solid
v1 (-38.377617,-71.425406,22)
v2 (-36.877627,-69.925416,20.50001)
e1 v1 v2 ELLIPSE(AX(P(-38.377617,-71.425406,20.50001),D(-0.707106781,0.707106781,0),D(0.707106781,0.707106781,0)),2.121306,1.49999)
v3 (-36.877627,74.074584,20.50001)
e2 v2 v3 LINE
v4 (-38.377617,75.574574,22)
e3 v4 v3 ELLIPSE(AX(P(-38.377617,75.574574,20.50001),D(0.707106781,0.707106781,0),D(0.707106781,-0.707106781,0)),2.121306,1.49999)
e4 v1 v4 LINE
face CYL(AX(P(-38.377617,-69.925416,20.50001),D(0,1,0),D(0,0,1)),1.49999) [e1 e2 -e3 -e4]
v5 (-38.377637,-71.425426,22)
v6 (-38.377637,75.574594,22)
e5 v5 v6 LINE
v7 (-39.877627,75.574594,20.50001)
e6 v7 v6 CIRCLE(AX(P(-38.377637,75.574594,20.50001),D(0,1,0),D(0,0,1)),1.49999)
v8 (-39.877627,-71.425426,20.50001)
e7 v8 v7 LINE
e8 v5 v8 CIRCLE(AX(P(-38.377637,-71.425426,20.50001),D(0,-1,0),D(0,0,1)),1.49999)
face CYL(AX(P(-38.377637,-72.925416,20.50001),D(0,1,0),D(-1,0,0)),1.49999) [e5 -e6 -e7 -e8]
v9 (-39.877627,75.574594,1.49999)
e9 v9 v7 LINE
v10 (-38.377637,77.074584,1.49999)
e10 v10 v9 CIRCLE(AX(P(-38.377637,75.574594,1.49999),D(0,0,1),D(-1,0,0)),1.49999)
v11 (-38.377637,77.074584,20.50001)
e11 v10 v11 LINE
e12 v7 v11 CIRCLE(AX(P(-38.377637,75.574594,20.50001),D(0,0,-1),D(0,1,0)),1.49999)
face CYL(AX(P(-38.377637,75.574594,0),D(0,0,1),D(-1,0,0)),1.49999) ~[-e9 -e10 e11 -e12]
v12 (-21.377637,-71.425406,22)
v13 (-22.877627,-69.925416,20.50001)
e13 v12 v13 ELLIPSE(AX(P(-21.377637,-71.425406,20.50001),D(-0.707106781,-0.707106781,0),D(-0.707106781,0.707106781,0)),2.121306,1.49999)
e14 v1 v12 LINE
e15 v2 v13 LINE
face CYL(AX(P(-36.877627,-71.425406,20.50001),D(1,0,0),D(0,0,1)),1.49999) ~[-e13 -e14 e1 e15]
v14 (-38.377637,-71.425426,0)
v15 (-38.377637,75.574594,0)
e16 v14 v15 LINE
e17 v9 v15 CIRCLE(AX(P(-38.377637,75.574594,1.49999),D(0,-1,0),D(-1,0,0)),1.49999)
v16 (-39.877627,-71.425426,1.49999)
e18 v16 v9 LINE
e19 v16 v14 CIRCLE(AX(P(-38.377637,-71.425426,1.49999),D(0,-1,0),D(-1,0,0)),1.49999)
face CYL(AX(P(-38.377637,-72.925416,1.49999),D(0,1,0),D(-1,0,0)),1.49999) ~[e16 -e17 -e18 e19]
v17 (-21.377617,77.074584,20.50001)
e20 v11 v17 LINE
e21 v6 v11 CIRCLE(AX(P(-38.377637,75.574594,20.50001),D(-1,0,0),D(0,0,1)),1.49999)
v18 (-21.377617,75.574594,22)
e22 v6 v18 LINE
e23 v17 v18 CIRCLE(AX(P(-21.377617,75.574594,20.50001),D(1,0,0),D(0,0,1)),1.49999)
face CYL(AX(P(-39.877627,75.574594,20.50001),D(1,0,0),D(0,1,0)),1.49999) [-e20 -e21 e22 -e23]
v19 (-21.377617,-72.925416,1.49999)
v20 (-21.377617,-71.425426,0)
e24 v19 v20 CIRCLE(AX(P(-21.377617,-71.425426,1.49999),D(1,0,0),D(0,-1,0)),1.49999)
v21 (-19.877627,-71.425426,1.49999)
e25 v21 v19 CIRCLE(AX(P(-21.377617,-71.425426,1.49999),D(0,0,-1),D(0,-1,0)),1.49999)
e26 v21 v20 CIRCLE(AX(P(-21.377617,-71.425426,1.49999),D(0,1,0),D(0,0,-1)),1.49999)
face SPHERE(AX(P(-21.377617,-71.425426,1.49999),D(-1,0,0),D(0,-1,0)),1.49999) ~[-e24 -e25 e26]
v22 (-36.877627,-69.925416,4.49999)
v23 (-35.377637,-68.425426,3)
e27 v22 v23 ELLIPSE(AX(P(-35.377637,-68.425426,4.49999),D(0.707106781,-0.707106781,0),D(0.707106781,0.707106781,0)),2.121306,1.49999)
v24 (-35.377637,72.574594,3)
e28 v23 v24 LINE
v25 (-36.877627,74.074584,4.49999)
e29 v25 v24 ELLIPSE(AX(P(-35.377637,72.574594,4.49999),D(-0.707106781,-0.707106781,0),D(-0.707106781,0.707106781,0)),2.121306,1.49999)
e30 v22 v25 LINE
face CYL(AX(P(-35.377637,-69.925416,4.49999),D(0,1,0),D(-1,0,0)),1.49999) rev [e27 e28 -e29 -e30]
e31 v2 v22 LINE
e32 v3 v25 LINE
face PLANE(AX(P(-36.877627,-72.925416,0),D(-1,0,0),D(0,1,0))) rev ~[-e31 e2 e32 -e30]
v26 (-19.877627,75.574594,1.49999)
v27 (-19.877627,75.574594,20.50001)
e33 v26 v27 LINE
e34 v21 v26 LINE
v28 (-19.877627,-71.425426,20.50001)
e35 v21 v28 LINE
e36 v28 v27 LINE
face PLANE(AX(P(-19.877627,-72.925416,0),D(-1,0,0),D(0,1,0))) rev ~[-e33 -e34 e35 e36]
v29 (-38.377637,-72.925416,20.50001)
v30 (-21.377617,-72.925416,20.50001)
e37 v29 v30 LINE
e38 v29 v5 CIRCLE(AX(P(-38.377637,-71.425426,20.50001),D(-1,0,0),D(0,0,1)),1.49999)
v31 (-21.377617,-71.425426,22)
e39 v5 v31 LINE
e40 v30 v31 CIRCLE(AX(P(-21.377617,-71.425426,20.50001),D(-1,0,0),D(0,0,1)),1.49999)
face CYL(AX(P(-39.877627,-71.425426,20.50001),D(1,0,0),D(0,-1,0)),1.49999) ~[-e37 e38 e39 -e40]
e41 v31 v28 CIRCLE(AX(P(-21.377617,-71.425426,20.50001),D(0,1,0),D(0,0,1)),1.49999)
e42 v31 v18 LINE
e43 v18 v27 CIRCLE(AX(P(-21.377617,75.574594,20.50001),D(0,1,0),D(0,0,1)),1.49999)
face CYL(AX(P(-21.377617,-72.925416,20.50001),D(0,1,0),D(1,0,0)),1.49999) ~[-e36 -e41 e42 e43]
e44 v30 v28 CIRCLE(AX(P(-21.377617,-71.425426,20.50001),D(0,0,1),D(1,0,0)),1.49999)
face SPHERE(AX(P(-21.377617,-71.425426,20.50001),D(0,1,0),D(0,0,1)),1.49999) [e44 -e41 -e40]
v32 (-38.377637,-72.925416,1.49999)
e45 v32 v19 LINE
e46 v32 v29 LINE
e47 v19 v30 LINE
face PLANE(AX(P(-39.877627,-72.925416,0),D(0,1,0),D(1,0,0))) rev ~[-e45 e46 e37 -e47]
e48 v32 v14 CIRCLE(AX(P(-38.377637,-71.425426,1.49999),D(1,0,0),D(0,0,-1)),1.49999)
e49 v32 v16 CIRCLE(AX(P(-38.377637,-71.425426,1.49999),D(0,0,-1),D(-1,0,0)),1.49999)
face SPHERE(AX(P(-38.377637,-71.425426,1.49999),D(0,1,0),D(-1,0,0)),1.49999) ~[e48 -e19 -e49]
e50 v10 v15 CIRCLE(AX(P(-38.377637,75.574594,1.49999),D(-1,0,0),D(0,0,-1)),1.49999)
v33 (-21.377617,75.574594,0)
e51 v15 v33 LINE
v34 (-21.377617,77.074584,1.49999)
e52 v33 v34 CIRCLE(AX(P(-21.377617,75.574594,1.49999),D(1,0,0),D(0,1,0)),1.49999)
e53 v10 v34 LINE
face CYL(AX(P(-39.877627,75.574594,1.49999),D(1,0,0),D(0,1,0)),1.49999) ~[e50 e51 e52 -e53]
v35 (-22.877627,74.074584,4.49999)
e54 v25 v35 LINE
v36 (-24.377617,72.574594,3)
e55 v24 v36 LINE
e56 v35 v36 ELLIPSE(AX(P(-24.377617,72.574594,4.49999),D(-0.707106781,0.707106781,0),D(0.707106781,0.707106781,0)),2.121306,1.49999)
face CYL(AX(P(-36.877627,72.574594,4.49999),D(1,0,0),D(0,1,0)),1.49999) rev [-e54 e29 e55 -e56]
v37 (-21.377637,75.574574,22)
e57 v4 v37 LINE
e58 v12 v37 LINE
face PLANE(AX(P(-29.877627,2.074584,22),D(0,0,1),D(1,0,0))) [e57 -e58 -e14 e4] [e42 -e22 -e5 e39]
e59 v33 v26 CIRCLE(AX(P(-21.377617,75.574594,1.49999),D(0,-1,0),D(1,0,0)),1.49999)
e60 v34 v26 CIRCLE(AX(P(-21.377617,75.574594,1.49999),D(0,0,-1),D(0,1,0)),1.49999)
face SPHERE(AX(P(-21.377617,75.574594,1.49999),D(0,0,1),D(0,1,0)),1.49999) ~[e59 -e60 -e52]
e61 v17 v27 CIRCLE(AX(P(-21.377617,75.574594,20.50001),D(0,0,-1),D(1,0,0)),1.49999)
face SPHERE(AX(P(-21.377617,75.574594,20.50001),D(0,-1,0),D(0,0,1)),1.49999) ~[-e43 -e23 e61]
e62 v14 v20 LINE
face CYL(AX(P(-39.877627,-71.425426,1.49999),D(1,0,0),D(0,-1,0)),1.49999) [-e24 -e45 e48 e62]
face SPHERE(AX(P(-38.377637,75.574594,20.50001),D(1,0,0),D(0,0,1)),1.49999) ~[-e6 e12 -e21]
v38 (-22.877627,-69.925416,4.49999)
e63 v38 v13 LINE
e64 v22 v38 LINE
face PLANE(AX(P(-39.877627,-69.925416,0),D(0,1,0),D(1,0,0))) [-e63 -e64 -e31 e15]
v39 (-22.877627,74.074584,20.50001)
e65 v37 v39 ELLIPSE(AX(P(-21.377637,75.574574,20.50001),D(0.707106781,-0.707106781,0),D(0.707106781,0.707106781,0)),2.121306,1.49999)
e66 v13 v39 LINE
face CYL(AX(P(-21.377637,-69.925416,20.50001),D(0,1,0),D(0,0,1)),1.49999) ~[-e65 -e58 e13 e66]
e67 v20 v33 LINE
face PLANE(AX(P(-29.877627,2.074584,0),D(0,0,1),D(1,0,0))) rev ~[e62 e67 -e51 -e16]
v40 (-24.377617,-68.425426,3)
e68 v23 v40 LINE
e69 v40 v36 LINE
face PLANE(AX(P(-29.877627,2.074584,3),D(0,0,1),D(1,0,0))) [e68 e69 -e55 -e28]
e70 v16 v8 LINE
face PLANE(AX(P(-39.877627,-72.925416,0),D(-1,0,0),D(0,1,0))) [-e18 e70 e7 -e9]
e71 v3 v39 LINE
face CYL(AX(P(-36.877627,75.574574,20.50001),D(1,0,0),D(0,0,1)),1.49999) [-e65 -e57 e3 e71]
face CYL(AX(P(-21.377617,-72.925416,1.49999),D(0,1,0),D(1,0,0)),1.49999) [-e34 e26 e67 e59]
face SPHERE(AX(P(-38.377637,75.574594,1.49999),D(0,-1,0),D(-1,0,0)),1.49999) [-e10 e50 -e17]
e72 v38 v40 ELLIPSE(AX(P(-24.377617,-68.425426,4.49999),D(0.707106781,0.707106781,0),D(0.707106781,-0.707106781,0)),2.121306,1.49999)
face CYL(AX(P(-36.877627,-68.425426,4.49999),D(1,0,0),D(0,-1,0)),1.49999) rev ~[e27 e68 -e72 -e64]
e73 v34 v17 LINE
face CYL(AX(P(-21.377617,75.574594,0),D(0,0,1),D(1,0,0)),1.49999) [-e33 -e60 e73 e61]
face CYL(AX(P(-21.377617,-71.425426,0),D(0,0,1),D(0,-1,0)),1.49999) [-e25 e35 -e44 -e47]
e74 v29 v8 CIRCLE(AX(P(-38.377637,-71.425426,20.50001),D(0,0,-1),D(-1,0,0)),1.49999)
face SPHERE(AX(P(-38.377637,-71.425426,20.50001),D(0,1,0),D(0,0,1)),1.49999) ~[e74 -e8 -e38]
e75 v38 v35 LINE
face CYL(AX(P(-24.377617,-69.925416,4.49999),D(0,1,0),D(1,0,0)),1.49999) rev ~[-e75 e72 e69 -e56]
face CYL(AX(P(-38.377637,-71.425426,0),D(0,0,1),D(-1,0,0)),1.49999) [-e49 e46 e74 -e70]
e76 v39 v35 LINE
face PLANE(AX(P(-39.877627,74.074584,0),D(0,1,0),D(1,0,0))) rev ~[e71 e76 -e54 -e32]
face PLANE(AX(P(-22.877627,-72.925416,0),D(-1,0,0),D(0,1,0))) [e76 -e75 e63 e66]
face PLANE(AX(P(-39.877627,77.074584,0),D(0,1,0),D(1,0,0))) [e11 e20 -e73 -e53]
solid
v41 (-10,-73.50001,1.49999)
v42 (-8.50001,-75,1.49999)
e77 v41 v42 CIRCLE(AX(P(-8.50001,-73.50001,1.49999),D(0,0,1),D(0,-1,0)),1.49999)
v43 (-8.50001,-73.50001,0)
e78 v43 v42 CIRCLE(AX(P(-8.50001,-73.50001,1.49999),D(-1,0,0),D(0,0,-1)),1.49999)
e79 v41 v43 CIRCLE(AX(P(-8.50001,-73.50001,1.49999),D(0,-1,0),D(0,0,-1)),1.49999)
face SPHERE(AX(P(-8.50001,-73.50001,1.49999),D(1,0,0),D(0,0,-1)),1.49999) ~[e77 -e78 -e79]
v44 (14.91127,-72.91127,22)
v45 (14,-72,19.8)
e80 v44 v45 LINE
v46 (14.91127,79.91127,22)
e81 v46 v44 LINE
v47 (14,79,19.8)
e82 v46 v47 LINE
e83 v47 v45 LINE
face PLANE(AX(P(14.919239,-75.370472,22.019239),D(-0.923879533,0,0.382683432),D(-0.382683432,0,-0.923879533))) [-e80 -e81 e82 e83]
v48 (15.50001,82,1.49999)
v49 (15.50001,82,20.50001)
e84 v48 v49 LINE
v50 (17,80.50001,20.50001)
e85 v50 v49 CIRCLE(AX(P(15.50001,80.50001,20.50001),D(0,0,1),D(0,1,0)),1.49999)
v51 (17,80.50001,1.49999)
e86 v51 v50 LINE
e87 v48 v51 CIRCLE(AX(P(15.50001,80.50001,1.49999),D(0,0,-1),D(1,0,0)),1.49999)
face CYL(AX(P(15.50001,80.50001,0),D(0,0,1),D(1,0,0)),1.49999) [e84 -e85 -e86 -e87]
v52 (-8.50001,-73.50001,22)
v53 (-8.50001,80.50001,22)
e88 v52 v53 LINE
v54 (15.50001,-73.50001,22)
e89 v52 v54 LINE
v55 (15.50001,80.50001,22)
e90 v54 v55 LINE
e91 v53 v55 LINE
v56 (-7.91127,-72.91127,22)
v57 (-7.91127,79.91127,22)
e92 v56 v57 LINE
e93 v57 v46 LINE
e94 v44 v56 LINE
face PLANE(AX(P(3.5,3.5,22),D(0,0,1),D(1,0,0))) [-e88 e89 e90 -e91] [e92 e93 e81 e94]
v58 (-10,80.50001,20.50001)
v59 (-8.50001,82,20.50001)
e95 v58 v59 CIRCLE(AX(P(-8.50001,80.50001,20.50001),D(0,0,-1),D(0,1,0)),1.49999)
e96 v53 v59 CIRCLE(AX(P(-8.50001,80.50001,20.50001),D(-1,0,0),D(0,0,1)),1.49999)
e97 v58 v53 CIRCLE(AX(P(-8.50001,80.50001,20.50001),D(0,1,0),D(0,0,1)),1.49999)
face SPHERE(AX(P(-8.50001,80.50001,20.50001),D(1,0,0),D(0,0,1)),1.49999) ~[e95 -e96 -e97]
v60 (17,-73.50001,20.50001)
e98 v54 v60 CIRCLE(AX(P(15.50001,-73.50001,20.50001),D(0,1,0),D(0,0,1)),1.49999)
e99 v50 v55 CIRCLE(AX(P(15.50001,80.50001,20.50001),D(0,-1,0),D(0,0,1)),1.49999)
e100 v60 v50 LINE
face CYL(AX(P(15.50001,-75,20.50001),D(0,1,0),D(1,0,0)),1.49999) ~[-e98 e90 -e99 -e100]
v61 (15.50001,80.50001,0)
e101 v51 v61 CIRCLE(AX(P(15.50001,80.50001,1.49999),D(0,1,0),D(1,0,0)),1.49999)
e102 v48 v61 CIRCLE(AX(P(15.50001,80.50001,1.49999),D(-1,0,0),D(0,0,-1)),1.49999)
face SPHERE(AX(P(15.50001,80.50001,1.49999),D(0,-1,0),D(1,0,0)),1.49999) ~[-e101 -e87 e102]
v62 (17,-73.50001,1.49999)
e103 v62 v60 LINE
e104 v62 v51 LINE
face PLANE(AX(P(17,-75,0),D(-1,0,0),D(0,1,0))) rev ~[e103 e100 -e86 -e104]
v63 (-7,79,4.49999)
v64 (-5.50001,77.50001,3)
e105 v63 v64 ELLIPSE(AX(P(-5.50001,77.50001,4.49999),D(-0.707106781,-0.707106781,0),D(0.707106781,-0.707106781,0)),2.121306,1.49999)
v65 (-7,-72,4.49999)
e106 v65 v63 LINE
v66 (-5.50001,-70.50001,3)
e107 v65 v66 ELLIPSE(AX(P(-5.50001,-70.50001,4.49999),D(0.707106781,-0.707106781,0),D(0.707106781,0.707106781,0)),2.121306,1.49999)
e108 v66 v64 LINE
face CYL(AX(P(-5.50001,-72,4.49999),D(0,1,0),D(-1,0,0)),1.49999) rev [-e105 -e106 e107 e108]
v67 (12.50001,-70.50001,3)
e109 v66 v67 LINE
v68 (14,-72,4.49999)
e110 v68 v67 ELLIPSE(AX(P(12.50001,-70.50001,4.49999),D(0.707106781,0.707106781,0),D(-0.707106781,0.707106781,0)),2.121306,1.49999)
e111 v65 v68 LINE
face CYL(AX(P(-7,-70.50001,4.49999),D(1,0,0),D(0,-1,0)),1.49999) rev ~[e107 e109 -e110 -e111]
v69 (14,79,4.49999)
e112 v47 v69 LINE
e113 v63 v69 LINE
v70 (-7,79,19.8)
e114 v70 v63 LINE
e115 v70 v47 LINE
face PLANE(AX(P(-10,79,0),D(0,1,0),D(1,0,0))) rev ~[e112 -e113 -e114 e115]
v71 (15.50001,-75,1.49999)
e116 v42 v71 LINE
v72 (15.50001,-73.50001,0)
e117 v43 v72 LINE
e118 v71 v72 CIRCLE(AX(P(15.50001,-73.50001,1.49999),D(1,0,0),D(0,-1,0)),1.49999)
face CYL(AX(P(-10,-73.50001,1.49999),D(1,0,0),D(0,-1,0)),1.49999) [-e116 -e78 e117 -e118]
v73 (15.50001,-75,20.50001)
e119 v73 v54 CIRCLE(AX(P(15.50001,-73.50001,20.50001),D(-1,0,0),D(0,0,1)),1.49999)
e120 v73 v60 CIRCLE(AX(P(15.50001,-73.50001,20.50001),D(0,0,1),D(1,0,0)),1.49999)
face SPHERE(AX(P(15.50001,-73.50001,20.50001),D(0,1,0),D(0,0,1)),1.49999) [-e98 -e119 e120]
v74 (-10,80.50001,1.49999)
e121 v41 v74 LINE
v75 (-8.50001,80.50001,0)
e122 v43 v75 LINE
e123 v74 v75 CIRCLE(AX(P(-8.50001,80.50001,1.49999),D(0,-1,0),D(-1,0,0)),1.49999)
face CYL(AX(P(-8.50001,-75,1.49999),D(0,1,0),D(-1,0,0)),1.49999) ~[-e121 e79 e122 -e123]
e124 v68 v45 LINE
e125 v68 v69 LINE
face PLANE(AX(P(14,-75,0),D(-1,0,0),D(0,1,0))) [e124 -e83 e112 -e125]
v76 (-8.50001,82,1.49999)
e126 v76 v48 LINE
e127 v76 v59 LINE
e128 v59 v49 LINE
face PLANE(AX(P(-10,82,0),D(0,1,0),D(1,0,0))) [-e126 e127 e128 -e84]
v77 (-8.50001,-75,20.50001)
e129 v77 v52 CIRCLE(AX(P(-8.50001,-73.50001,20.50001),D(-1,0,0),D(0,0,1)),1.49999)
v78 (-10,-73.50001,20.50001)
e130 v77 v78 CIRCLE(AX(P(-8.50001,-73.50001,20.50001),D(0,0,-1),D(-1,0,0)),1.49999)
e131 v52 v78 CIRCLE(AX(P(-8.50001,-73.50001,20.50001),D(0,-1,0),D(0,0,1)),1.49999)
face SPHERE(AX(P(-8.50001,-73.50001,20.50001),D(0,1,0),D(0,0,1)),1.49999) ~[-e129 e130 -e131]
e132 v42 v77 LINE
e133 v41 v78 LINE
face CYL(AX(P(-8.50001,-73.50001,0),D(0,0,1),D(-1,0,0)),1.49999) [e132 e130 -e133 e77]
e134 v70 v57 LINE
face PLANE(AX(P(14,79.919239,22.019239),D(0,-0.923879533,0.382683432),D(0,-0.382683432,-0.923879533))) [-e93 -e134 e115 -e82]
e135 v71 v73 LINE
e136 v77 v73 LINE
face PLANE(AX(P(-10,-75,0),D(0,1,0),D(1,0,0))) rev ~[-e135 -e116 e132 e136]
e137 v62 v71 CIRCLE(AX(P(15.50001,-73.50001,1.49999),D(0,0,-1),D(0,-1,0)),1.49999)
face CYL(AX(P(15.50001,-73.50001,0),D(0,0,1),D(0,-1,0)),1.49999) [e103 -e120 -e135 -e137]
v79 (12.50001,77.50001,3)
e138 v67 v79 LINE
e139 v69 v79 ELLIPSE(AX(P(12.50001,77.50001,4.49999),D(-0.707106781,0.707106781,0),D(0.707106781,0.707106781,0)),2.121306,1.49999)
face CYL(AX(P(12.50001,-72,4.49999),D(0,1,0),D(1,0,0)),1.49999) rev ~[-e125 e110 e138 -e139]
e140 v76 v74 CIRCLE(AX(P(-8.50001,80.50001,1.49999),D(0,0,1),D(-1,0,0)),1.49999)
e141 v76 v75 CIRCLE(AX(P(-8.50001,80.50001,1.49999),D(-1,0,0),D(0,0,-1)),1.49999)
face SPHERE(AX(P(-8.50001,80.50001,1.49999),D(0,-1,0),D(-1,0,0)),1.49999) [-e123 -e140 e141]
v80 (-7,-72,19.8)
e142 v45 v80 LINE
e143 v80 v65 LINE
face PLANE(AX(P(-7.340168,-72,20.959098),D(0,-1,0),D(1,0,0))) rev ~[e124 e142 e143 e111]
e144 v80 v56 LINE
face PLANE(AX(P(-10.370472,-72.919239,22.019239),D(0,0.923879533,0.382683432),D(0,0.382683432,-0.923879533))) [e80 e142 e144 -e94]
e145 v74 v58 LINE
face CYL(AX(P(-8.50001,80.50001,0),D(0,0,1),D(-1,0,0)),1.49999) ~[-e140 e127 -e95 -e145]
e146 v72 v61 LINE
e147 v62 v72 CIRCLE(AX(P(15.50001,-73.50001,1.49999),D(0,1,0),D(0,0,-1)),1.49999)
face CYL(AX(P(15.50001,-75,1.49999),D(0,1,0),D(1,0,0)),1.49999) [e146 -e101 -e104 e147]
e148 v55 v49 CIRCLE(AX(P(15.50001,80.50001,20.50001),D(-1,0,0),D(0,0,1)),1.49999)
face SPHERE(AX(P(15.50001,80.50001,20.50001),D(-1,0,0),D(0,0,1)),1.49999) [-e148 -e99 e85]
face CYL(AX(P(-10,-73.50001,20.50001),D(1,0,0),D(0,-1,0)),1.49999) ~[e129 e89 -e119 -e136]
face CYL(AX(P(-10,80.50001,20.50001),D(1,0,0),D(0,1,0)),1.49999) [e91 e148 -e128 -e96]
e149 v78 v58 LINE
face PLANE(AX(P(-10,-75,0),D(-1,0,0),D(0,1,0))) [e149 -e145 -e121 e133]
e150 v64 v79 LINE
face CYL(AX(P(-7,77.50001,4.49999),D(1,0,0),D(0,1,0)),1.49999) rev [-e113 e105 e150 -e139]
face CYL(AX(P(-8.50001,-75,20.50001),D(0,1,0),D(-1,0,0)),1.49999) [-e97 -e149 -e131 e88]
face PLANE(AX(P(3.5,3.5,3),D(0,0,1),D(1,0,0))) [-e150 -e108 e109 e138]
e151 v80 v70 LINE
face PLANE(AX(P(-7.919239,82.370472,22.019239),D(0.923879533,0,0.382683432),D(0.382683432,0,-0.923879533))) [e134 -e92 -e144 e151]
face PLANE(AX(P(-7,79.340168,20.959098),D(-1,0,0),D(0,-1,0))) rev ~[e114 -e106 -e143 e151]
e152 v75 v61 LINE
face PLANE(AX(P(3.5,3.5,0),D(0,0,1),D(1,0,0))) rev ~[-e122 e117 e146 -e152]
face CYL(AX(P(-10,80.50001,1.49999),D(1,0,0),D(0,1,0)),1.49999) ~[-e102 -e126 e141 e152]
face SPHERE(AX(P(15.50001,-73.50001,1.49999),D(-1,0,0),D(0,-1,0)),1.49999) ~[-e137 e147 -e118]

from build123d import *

# Parameters (mm, degrees)
F0_W          = 20
F0_H          = 150
F1_DEPTH      = 22
F2_T          = -3
F3_W          = 27
F3_H          = 157
F4_DEPTH      = 22
F5_T          = -3
F6_R          = 1.49999
F6_2_R        = 1.49999
F7_SIZE       = 0.9
F8_T4_DEPTH   = 21
F8_T9_DEPTH   = 24.3704715108
F8_T15_DEPTH  = 21
F8_T21_DEPTH  = 21
F8_T26_DEPTH  = 24.3704715108
F8_T32_DEPTH  = 151
F8_T37_DEPTH  = 154.3704715108
F8_T43_DEPTH  = 151
F8_T49_DEPTH  = 151
F8_T54_DEPTH  = 154.3704715108
F8_T60_DEPTH  = 151
F8_T65_DEPTH  = 154.3704715108
F8_T71_DEPTH  = 151
F8_T77_DEPTH  = 151
F8_T82_DEPTH  = 154.3704715108
F8_T88_DEPTH  = 21
F8_T93_DEPTH  = 24.3704715108
F8_T99_DEPTH  = 21
F8_T105_DEPTH = 21
F8_T110_DEPTH = 24.3704715108
F8_T117_DEPTH = 24.3704715108
F8_T122_DEPTH = 154.3704715108
F8_T130_DEPTH = 24.3704715108
F8_T135_DEPTH = 154.3704715108
F8_T143_DEPTH = 154.3704715108
F8_T148_DEPTH = 24.3704715108
F8_T156_DEPTH = 154.3704715108
F8_T161_DEPTH = 24.3704715108


# Not quite as in the source:
# - a fillet or chamfer that OpenCascade refuses, or shapes differently, is made with other operations: its cross-section is extruded or revolved along the edge and cut away or added
# - a fillet or chamfer is up to 0.001 mm smaller than in the source, because OpenCascade refuses the exact size


with BuildPart() as f1:
    # F0 (on Top) → F1 (new body)
    with BuildSketch(Plane.XY):
        with Locations((-29.877627335, 2.0745843649)):
            Rectangle(F0_W, F0_H)
    extrude(amount=F1_DEPTH)

    # F2
    f2_openings = [f1.faces().sort_by_distance(p)[0] for p in [
        (-29.877627, 2.074584, 22),
    ]]
    offset(amount=F2_T, openings=f2_openings)

    # F6 (radius 1.5 in the source; OpenCascade refuses exactly that, so slightly less here)
    f6_edges = [f1.edges().sort_by_distance(p)[0] for p in [
        (-19.877627, 2.074584, 22),
        (-22.877627, 2.074584, 22),
        (-29.877627, 77.074584, 22),
        (-29.877627, 74.074584, 22),
        (-39.877627, 2.074584, 22),
        (-36.877627, 2.074584, 22),
        (-29.877627, -69.925416, 22),
        (-29.877627, -72.925416, 22),
        (-39.877627, 2.074584, 0),
        (-39.877627, -72.925416, 11),
        (-29.877627, -72.925416, 0),
        (-19.877627, -72.925416, 11),
        (-19.877627, 77.074584, 11),
        (-39.877627, 77.074584, 11),
        (-29.877627, 77.074584, 0),
        (-19.877627, 2.074584, 0),
        (-36.877627, 2.074584, 3),
        (-29.877627, -69.925416, 3),
        (-29.877627, 74.074584, 3),
        (-22.877627, 2.074584, 3),
    ]]
    fillet(f6_edges, radius=F6_R)


with BuildPart() as f4:
    # F3 (on Top) → F4 (new body)
    with BuildSketch(Plane.XY):
        with Locations((3.5, 3.5)):
            Rectangle(F3_W, F3_H)
    extrude(amount=F4_DEPTH)

    # F5
    f5_openings = [f4.faces().sort_by_distance(p)[0] for p in [
        (3.5, 3.5, 22),
    ]]
    offset(amount=F5_T, openings=f5_openings)

    # F6#2 (radius 1.5 in the source; OpenCascade refuses exactly that, so slightly less here)
    f6_2_edges = [f4.edges().sort_by_distance(p)[0] for p in [
        (3.5, 82, 22),
        (-10, 3.5, 22),
        (17, 3.5, 22),
        (3.5, -75, 22),
        (3.5, -75, 0),
        (17, -75, 11),
        (17, 3.5, 0),
        (-10, 3.5, 0),
        (-10, -75, 11),
        (-10, 82, 11),
        (17, 82, 11),
        (3.5, 82, 0),
        (3.5, 79, 3),
        (14, 3.5, 3),
        (-7, 3.5, 3),
        (3.5, -72, 3),
    ]]
    fillet(f6_2_edges, radius=F6_2_R)

    # F7
    f7_edges = [f4.edges().sort_by_distance(p)[0] for p in [
        (3.5, 79, 22),
        (-7, 3.5, 22),
        (14, 3.5, 22),
        (3.5, -72, 22),
    ]]
    chamfer(f7_edges, length=F7_SIZE)

    # F8: chamfer of 1.3 on 4 edges, made by hand


with BuildPart() as f8_tool2:
    # F8_s3 → F8_t4 (new body)
    with BuildSketch(Plane.YZ.offset(14)):
        Polygon((79.9192388155, 22.0192388155), (79, 19.8), (79, 21.1), align=None)
    extrude(amount=-F8_T4_DEPTH)

    split(bisect_by=Plane(origin=(-3.55, 0, 3.55), x_dir=(0, 1, 0), z_dir=(0.7071067812, 0, -0.7071067812)), keep=Keep.TOP)


with BuildPart() as f4_1:
    add(f4.part)

    # F8_t1: cut F8_tool2
    add(f8_tool2.part, mode=Mode.SUBTRACT)


with BuildPart() as f8_tool7:
    # F8_s8 → F8_t9 (new body)
    with BuildSketch(Plane.YZ.offset(17.3704715108)):
        Polygon((79.9192388155, 22.0192388155), (79, 19.8), (79, 21.1), align=None)
    extrude(amount=-F8_T9_DEPTH)

    split(bisect_by=Plane(origin=(-3.55, 0, 3.55), x_dir=(0, 1, 0), z_dir=(-0.7071067812, 0, 0.7071067812)), keep=Keep.TOP)

    split(bisect_by=Plane.YZ.offset(14), keep=Keep.TOP)


with BuildPart() as f4_2:
    add(f4_1.part)

    # F8_t6: cut F8_tool7
    add(f8_tool7.part, mode=Mode.SUBTRACT)


with BuildPart() as f8_tool13:
    # F8_s14 → F8_t15 (new body)
    with BuildSketch(Plane.YZ.offset(14)):
        Polygon((79.9192388155, 22.0192388155), (79, 19.8), (79, 21.1), align=None)
    extrude(amount=-F8_T15_DEPTH)

    split(bisect_by=Plane(origin=(-3.55, 0, 3.55), x_dir=(0, 1, 0), z_dir=(-0.7071067812, 0, 0.7071067812)), keep=Keep.TOP)

    split(bisect_by=Plane(origin=(7.05, 0, 7.05), x_dir=(0, 1, 0), z_dir=(0.7071067812, 0, 0.7071067812)), keep=Keep.TOP)


with BuildPart() as f4_3:
    add(f4_2.part)

    # F8_t12: cut F8_tool13
    add(f8_tool13.part, mode=Mode.SUBTRACT)


with BuildPart() as f8_tool19:
    # F8_s20 → F8_t21 (new body)
    with BuildSketch(Plane.YZ.offset(14)):
        Polygon((79.9192388155, 22.0192388155), (79, 19.8), (79, 21.1), align=None)
    extrude(amount=-F8_T21_DEPTH)

    split(bisect_by=Plane(origin=(7.05, 0, 7.05), x_dir=(0, 1, 0), z_dir=(-0.7071067812, 0, -0.7071067812)), keep=Keep.TOP)


with BuildPart() as f4_4:
    add(f4_3.part)

    # F8_t18: cut F8_tool19
    add(f8_tool19.part, mode=Mode.SUBTRACT)


with BuildPart() as f8_tool24:
    # F8_s25 → F8_t26 (new body)
    with BuildSketch(Plane.YZ.offset(14)):
        Polygon((79.9192388155, 22.0192388155), (79, 19.8), (79, 21.1), align=None)
    extrude(amount=-F8_T26_DEPTH)

    split(bisect_by=Plane(origin=(7.05, 0, 7.05), x_dir=(0, 1, 0), z_dir=(0.7071067812, 0, 0.7071067812)), keep=Keep.TOP)

    split(bisect_by=Plane.YZ.offset(-7), keep=Keep.BOTTOM)


with BuildPart() as f4_5:
    add(f4_4.part)

    # F8_t23: cut F8_tool24
    add(f8_tool24.part, mode=Mode.SUBTRACT)


with BuildPart() as f8_tool30:
    # F8_s31 → F8_t32 (new body)
    with BuildSketch(Plane.XZ.offset(-79)):
        Polygon((-7.9192388155, 22.0192388155), (-7, 19.8), (-7, 21.1), align=None)
    extrude(amount=F8_T32_DEPTH)

    split(bisect_by=Plane(origin=(0, 28.95, -28.95), x_dir=(1, 0, 0), z_dir=(0, 0.7071067812, -0.7071067812)), keep=Keep.TOP)


with BuildPart() as f4_6:
    add(f4_5.part)

    # F8_t29: cut F8_tool30
    add(f8_tool30.part, mode=Mode.SUBTRACT)


with BuildPart() as f8_tool35:
    # F8_s36 → F8_t37 (new body)
    with BuildSketch(Plane.XZ.offset(-82.3704715108)):
        Polygon((-7.9192388155, 22.0192388155), (-7, 19.8), (-7, 21.1), align=None)
    extrude(amount=F8_T37_DEPTH)

    split(bisect_by=Plane(origin=(0, 28.95, -28.95), x_dir=(1, 0, 0), z_dir=(0, -0.7071067812, 0.7071067812)), keep=Keep.TOP)

    split(bisect_by=Plane.XZ.offset(-79), keep=Keep.BOTTOM)


with BuildPart() as f4_7:
    add(f4_6.part)

    # F8_t34: cut F8_tool35
    add(f8_tool35.part, mode=Mode.SUBTRACT)


with BuildPart() as f8_tool41:
    # F8_s42 → F8_t43 (new body)
    with BuildSketch(Plane.XZ.offset(-79)):
        Polygon((-7.9192388155, 22.0192388155), (-7, 19.8), (-7, 21.1), align=None)
    extrude(amount=F8_T43_DEPTH)

    split(bisect_by=Plane(origin=(0, 28.95, -28.95), x_dir=(1, 0, 0), z_dir=(0, -0.7071067812, 0.7071067812)), keep=Keep.TOP)

    split(bisect_by=Plane(origin=(0, -25.45, -25.45), x_dir=(1, 0, 0), z_dir=(0, 0.7071067812, 0.7071067812)), keep=Keep.TOP)


with BuildPart() as f4_8:
    add(f4_7.part)

    # F8_t40: cut F8_tool41
    add(f8_tool41.part, mode=Mode.SUBTRACT)


with BuildPart() as f8_tool47:
    # F8_s48 → F8_t49 (new body)
    with BuildSketch(Plane.XZ.offset(-79)):
        Polygon((-7.9192388155, 22.0192388155), (-7, 19.8), (-7, 21.1), align=None)
    extrude(amount=F8_T49_DEPTH)

    split(bisect_by=Plane(origin=(0, -25.45, -25.45), x_dir=(1, 0, 0), z_dir=(0, -0.7071067812, -0.7071067812)), keep=Keep.TOP)


with BuildPart() as f4_9:
    add(f4_8.part)

    # F8_t46: cut F8_tool47
    add(f8_tool47.part, mode=Mode.SUBTRACT)


with BuildPart() as f8_tool52:
    # F8_s53 → F8_t54 (new body)
    with BuildSketch(Plane.XZ.offset(-79)):
        Polygon((-7.9192388155, 22.0192388155), (-7, 19.8), (-7, 21.1), align=None)
    extrude(amount=F8_T54_DEPTH)

    split(bisect_by=Plane(origin=(0, -25.45, -25.45), x_dir=(1, 0, 0), z_dir=(0, 0.7071067812, 0.7071067812)), keep=Keep.TOP)

    split(bisect_by=Plane.XZ.offset(72), keep=Keep.TOP)


with BuildPart() as f4_10:
    add(f4_9.part)

    # F8_t51: cut F8_tool52
    add(f8_tool52.part, mode=Mode.SUBTRACT)


with BuildPart() as f8_tool58:
    # F8_s59 → F8_t60 (new body)
    with BuildSketch(Plane.XZ.offset(72)):
        Polygon((14.9192388155, 22.0192388155), (14, 19.8), (14, 21.1), align=None)
    extrude(amount=-F8_T60_DEPTH)

    split(bisect_by=Plane(origin=(0, -25.45, -25.45), x_dir=(1, 0, 0), z_dir=(0, -0.7071067812, -0.7071067812)), keep=Keep.TOP)


with BuildPart() as f4_11:
    add(f4_10.part)

    # F8_t57: cut F8_tool58
    add(f8_tool58.part, mode=Mode.SUBTRACT)


with BuildPart() as f8_tool63:
    # F8_s64 → F8_t65 (new body)
    with BuildSketch(Plane.XZ.offset(75.3704715108)):
        Polygon((14.9192388155, 22.0192388155), (14, 19.8), (14, 21.1), align=None)
    extrude(amount=-F8_T65_DEPTH)

    split(bisect_by=Plane(origin=(0, -25.45, -25.45), x_dir=(1, 0, 0), z_dir=(0, 0.7071067812, 0.7071067812)), keep=Keep.TOP)

    split(bisect_by=Plane.XZ.offset(72), keep=Keep.TOP)


with BuildPart() as f4_12:
    add(f4_11.part)

    # F8_t62: cut F8_tool63
    add(f8_tool63.part, mode=Mode.SUBTRACT)


with BuildPart() as f8_tool69:
    # F8_s70 → F8_t71 (new body)
    with BuildSketch(Plane.XZ.offset(72)):
        Polygon((14.9192388155, 22.0192388155), (14, 19.8), (14, 21.1), align=None)
    extrude(amount=-F8_T71_DEPTH)

    split(bisect_by=Plane(origin=(0, 28.95, -28.95), x_dir=(1, 0, 0), z_dir=(0, -0.7071067812, 0.7071067812)), keep=Keep.TOP)

    split(bisect_by=Plane(origin=(0, -25.45, -25.45), x_dir=(1, 0, 0), z_dir=(0, 0.7071067812, 0.7071067812)), keep=Keep.TOP)


with BuildPart() as f4_13:
    add(f4_12.part)

    # F8_t68: cut F8_tool69
    add(f8_tool69.part, mode=Mode.SUBTRACT)


with BuildPart() as f8_tool75:
    # F8_s76 → F8_t77 (new body)
    with BuildSketch(Plane.XZ.offset(72)):
        Polygon((14.9192388155, 22.0192388155), (14, 19.8), (14, 21.1), align=None)
    extrude(amount=-F8_T77_DEPTH)

    split(bisect_by=Plane(origin=(0, 28.95, -28.95), x_dir=(1, 0, 0), z_dir=(0, 0.7071067812, -0.7071067812)), keep=Keep.TOP)


with BuildPart() as f4_14:
    add(f4_13.part)

    # F8_t74: cut F8_tool75
    add(f8_tool75.part, mode=Mode.SUBTRACT)


with BuildPart() as f8_tool80:
    # F8_s81 → F8_t82 (new body)
    with BuildSketch(Plane.XZ.offset(72)):
        Polygon((14.9192388155, 22.0192388155), (14, 19.8), (14, 21.1), align=None)
    extrude(amount=-F8_T82_DEPTH)

    split(bisect_by=Plane(origin=(0, 28.95, -28.95), x_dir=(1, 0, 0), z_dir=(0, -0.7071067812, 0.7071067812)), keep=Keep.TOP)

    split(bisect_by=Plane.XZ.offset(-79), keep=Keep.BOTTOM)


with BuildPart() as f4_15:
    add(f4_14.part)

    # F8_t79: cut F8_tool80
    add(f8_tool80.part, mode=Mode.SUBTRACT)


with BuildPart() as f8_tool86:
    # F8_s87 → F8_t88 (new body)
    with BuildSketch(Plane.YZ.offset(-7)):
        Polygon((-72.9192388155, 22.0192388155), (-72, 19.8), (-72, 21.1), align=None)
    extrude(amount=F8_T88_DEPTH)

    split(bisect_by=Plane(origin=(7.05, 0, 7.05), x_dir=(0, 1, 0), z_dir=(-0.7071067812, 0, -0.7071067812)), keep=Keep.TOP)


with BuildPart() as f4_16:
    add(f4_15.part)

    # F8_t85: cut F8_tool86
    add(f8_tool86.part, mode=Mode.SUBTRACT)


with BuildPart() as f8_tool91:
    # F8_s92 → F8_t93 (new body)
    with BuildSketch(Plane.YZ.offset(-10.3704715108)):
        Polygon((-72.9192388155, 22.0192388155), (-72, 19.8), (-72, 21.1), align=None)
    extrude(amount=F8_T93_DEPTH)

    split(bisect_by=Plane(origin=(7.05, 0, 7.05), x_dir=(0, 1, 0), z_dir=(0.7071067812, 0, 0.7071067812)), keep=Keep.TOP)

    split(bisect_by=Plane.YZ.offset(-7), keep=Keep.BOTTOM)


with BuildPart() as f4_17:
    add(f4_16.part)

    # F8_t90: cut F8_tool91
    add(f8_tool91.part, mode=Mode.SUBTRACT)


with BuildPart() as f8_tool97:
    # F8_s98 → F8_t99 (new body)
    with BuildSketch(Plane.YZ.offset(-7)):
        Polygon((-72.9192388155, 22.0192388155), (-72, 19.8), (-72, 21.1), align=None)
    extrude(amount=F8_T99_DEPTH)

    split(bisect_by=Plane(origin=(-3.55, 0, 3.55), x_dir=(0, 1, 0), z_dir=(-0.7071067812, 0, 0.7071067812)), keep=Keep.TOP)

    split(bisect_by=Plane(origin=(7.05, 0, 7.05), x_dir=(0, 1, 0), z_dir=(0.7071067812, 0, 0.7071067812)), keep=Keep.TOP)


with BuildPart() as f4_18:
    add(f4_17.part)

    # F8_t96: cut F8_tool97
    add(f8_tool97.part, mode=Mode.SUBTRACT)


with BuildPart() as f8_tool103:
    # F8_s104 → F8_t105 (new body)
    with BuildSketch(Plane.YZ.offset(-7)):
        Polygon((-72.9192388155, 22.0192388155), (-72, 19.8), (-72, 21.1), align=None)
    extrude(amount=F8_T105_DEPTH)

    split(bisect_by=Plane(origin=(-3.55, 0, 3.55), x_dir=(0, 1, 0), z_dir=(0.7071067812, 0, -0.7071067812)), keep=Keep.TOP)


with BuildPart() as f4_19:
    add(f4_18.part)

    # F8_t102: cut F8_tool103
    add(f8_tool103.part, mode=Mode.SUBTRACT)


with BuildPart() as f8_tool108:
    # F8_s109 → F8_t110 (new body)
    with BuildSketch(Plane.YZ.offset(-7)):
        Polygon((-72.9192388155, 22.0192388155), (-72, 19.8), (-72, 21.1), align=None)
    extrude(amount=F8_T110_DEPTH)

    split(bisect_by=Plane(origin=(-3.55, 0, 3.55), x_dir=(0, 1, 0), z_dir=(-0.7071067812, 0, 0.7071067812)), keep=Keep.TOP)

    split(bisect_by=Plane.YZ.offset(14), keep=Keep.TOP)


with BuildPart() as f4_20:
    add(f4_19.part)

    # F8_t107: cut F8_tool108
    add(f8_tool108.part, mode=Mode.SUBTRACT)


with BuildPart() as f8_tool115:
    # F8_s116 → F8_t117 (new body)
    with BuildSketch(Plane.YZ.offset(17.3704715108)):
        Polygon((79.9192388155, 22.0192388155), (79, 19.8), (79, 21.1), align=None)
    extrude(amount=-F8_T117_DEPTH)

    split(bisect_by=Plane(origin=(-3.55, 0, 3.55), x_dir=(0, 1, 0), z_dir=(0.7071067812, 0, -0.7071067812)), keep=Keep.TOP)

    split(bisect_by=Plane.YZ.offset(14), keep=Keep.TOP)


with BuildPart() as f8_tool120:
    # F8_s121 → F8_t122 (new body)
    with BuildSketch(Plane.XZ.offset(72)):
        Polygon((14.9192388155, 22.0192388155), (14, 19.8), (14, 21.1), align=None)
    extrude(amount=-F8_T122_DEPTH)

    split(bisect_by=Plane(origin=(0, 28.95, -28.95), x_dir=(1, 0, 0), z_dir=(0, 0.7071067812, -0.7071067812)), keep=Keep.TOP)

    split(bisect_by=Plane.XZ.offset(-79), keep=Keep.BOTTOM)


with BuildPart() as f8_tool115_1:
    add(f8_tool115.part)

    # F8_t125: intersect F8_tool120
    add(f8_tool120.part, mode=Mode.INTERSECT)


with BuildPart() as f4_21:
    add(f4_20.part)

    # F8_t113: cut F8_tool115
    add(f8_tool115_1.part, mode=Mode.SUBTRACT)


with BuildPart() as f8_tool128:
    # F8_s129 → F8_t130 (new body)
    with BuildSketch(Plane.YZ.offset(14)):
        Polygon((79.9192388155, 22.0192388155), (79, 19.8), (79, 21.1), align=None)
    extrude(amount=-F8_T130_DEPTH)

    split(bisect_by=Plane(origin=(7.05, 0, 7.05), x_dir=(0, 1, 0), z_dir=(-0.7071067812, 0, -0.7071067812)), keep=Keep.TOP)

    split(bisect_by=Plane.YZ.offset(-7), keep=Keep.BOTTOM)


with BuildPart() as f8_tool133:
    # F8_s134 → F8_t135 (new body)
    with BuildSketch(Plane.XZ.offset(-82.3704715108)):
        Polygon((-7.9192388155, 22.0192388155), (-7, 19.8), (-7, 21.1), align=None)
    extrude(amount=F8_T135_DEPTH)

    split(bisect_by=Plane(origin=(0, 28.95, -28.95), x_dir=(1, 0, 0), z_dir=(0, 0.7071067812, -0.7071067812)), keep=Keep.TOP)

    split(bisect_by=Plane.XZ.offset(-79), keep=Keep.BOTTOM)


with BuildPart() as f8_tool128_1:
    add(f8_tool128.part)

    # F8_t138: intersect F8_tool133
    add(f8_tool133.part, mode=Mode.INTERSECT)


with BuildPart() as f4_22:
    add(f4_21.part)

    # F8_t126: cut F8_tool128
    add(f8_tool128_1.part, mode=Mode.SUBTRACT)


with BuildPart() as f8_tool141:
    # F8_s142 → F8_t143 (new body)
    with BuildSketch(Plane.XZ.offset(-79)):
        Polygon((-7.9192388155, 22.0192388155), (-7, 19.8), (-7, 21.1), align=None)
    extrude(amount=F8_T143_DEPTH)

    split(bisect_by=Plane(origin=(0, -25.45, -25.45), x_dir=(1, 0, 0), z_dir=(0, -0.7071067812, -0.7071067812)), keep=Keep.TOP)

    split(bisect_by=Plane.XZ.offset(72), keep=Keep.TOP)


with BuildPart() as f8_tool146:
    # F8_s147 → F8_t148 (new body)
    with BuildSketch(Plane.YZ.offset(-10.3704715108)):
        Polygon((-72.9192388155, 22.0192388155), (-72, 19.8), (-72, 21.1), align=None)
    extrude(amount=F8_T148_DEPTH)

    split(bisect_by=Plane(origin=(7.05, 0, 7.05), x_dir=(0, 1, 0), z_dir=(-0.7071067812, 0, -0.7071067812)), keep=Keep.TOP)

    split(bisect_by=Plane.YZ.offset(-7), keep=Keep.BOTTOM)


with BuildPart() as f8_tool141_1:
    add(f8_tool141.part)

    # F8_t151: intersect F8_tool146
    add(f8_tool146.part, mode=Mode.INTERSECT)


with BuildPart() as f4_23:
    add(f4_22.part)

    # F8_t139: cut F8_tool141
    add(f8_tool141_1.part, mode=Mode.SUBTRACT)


with BuildPart() as f8_tool154:
    # F8_s155 → F8_t156 (new body)
    with BuildSketch(Plane.XZ.offset(75.3704715108)):
        Polygon((14.9192388155, 22.0192388155), (14, 19.8), (14, 21.1), align=None)
    extrude(amount=-F8_T156_DEPTH)

    split(bisect_by=Plane(origin=(0, -25.45, -25.45), x_dir=(1, 0, 0), z_dir=(0, -0.7071067812, -0.7071067812)), keep=Keep.TOP)

    split(bisect_by=Plane.XZ.offset(72), keep=Keep.TOP)


with BuildPart() as f8_tool159:
    # F8_s160 → F8_t161 (new body)
    with BuildSketch(Plane.YZ.offset(-7)):
        Polygon((-72.9192388155, 22.0192388155), (-72, 19.8), (-72, 21.1), align=None)
    extrude(amount=F8_T161_DEPTH)

    split(bisect_by=Plane(origin=(-3.55, 0, 3.55), x_dir=(0, 1, 0), z_dir=(0.7071067812, 0, -0.7071067812)), keep=Keep.TOP)

    split(bisect_by=Plane.YZ.offset(14), keep=Keep.TOP)


with BuildPart() as f8_tool154_1:
    add(f8_tool154.part)

    # F8_t164: intersect F8_tool159
    add(f8_tool159.part, mode=Mode.INTERSECT)


with BuildPart() as f4_24:
    add(f4_23.part)

    # F8_t152: cut F8_tool154
    add(f8_tool154_1.part, mode=Mode.SUBTRACT)


solid = Compound([f1.part, f4_24.part])
